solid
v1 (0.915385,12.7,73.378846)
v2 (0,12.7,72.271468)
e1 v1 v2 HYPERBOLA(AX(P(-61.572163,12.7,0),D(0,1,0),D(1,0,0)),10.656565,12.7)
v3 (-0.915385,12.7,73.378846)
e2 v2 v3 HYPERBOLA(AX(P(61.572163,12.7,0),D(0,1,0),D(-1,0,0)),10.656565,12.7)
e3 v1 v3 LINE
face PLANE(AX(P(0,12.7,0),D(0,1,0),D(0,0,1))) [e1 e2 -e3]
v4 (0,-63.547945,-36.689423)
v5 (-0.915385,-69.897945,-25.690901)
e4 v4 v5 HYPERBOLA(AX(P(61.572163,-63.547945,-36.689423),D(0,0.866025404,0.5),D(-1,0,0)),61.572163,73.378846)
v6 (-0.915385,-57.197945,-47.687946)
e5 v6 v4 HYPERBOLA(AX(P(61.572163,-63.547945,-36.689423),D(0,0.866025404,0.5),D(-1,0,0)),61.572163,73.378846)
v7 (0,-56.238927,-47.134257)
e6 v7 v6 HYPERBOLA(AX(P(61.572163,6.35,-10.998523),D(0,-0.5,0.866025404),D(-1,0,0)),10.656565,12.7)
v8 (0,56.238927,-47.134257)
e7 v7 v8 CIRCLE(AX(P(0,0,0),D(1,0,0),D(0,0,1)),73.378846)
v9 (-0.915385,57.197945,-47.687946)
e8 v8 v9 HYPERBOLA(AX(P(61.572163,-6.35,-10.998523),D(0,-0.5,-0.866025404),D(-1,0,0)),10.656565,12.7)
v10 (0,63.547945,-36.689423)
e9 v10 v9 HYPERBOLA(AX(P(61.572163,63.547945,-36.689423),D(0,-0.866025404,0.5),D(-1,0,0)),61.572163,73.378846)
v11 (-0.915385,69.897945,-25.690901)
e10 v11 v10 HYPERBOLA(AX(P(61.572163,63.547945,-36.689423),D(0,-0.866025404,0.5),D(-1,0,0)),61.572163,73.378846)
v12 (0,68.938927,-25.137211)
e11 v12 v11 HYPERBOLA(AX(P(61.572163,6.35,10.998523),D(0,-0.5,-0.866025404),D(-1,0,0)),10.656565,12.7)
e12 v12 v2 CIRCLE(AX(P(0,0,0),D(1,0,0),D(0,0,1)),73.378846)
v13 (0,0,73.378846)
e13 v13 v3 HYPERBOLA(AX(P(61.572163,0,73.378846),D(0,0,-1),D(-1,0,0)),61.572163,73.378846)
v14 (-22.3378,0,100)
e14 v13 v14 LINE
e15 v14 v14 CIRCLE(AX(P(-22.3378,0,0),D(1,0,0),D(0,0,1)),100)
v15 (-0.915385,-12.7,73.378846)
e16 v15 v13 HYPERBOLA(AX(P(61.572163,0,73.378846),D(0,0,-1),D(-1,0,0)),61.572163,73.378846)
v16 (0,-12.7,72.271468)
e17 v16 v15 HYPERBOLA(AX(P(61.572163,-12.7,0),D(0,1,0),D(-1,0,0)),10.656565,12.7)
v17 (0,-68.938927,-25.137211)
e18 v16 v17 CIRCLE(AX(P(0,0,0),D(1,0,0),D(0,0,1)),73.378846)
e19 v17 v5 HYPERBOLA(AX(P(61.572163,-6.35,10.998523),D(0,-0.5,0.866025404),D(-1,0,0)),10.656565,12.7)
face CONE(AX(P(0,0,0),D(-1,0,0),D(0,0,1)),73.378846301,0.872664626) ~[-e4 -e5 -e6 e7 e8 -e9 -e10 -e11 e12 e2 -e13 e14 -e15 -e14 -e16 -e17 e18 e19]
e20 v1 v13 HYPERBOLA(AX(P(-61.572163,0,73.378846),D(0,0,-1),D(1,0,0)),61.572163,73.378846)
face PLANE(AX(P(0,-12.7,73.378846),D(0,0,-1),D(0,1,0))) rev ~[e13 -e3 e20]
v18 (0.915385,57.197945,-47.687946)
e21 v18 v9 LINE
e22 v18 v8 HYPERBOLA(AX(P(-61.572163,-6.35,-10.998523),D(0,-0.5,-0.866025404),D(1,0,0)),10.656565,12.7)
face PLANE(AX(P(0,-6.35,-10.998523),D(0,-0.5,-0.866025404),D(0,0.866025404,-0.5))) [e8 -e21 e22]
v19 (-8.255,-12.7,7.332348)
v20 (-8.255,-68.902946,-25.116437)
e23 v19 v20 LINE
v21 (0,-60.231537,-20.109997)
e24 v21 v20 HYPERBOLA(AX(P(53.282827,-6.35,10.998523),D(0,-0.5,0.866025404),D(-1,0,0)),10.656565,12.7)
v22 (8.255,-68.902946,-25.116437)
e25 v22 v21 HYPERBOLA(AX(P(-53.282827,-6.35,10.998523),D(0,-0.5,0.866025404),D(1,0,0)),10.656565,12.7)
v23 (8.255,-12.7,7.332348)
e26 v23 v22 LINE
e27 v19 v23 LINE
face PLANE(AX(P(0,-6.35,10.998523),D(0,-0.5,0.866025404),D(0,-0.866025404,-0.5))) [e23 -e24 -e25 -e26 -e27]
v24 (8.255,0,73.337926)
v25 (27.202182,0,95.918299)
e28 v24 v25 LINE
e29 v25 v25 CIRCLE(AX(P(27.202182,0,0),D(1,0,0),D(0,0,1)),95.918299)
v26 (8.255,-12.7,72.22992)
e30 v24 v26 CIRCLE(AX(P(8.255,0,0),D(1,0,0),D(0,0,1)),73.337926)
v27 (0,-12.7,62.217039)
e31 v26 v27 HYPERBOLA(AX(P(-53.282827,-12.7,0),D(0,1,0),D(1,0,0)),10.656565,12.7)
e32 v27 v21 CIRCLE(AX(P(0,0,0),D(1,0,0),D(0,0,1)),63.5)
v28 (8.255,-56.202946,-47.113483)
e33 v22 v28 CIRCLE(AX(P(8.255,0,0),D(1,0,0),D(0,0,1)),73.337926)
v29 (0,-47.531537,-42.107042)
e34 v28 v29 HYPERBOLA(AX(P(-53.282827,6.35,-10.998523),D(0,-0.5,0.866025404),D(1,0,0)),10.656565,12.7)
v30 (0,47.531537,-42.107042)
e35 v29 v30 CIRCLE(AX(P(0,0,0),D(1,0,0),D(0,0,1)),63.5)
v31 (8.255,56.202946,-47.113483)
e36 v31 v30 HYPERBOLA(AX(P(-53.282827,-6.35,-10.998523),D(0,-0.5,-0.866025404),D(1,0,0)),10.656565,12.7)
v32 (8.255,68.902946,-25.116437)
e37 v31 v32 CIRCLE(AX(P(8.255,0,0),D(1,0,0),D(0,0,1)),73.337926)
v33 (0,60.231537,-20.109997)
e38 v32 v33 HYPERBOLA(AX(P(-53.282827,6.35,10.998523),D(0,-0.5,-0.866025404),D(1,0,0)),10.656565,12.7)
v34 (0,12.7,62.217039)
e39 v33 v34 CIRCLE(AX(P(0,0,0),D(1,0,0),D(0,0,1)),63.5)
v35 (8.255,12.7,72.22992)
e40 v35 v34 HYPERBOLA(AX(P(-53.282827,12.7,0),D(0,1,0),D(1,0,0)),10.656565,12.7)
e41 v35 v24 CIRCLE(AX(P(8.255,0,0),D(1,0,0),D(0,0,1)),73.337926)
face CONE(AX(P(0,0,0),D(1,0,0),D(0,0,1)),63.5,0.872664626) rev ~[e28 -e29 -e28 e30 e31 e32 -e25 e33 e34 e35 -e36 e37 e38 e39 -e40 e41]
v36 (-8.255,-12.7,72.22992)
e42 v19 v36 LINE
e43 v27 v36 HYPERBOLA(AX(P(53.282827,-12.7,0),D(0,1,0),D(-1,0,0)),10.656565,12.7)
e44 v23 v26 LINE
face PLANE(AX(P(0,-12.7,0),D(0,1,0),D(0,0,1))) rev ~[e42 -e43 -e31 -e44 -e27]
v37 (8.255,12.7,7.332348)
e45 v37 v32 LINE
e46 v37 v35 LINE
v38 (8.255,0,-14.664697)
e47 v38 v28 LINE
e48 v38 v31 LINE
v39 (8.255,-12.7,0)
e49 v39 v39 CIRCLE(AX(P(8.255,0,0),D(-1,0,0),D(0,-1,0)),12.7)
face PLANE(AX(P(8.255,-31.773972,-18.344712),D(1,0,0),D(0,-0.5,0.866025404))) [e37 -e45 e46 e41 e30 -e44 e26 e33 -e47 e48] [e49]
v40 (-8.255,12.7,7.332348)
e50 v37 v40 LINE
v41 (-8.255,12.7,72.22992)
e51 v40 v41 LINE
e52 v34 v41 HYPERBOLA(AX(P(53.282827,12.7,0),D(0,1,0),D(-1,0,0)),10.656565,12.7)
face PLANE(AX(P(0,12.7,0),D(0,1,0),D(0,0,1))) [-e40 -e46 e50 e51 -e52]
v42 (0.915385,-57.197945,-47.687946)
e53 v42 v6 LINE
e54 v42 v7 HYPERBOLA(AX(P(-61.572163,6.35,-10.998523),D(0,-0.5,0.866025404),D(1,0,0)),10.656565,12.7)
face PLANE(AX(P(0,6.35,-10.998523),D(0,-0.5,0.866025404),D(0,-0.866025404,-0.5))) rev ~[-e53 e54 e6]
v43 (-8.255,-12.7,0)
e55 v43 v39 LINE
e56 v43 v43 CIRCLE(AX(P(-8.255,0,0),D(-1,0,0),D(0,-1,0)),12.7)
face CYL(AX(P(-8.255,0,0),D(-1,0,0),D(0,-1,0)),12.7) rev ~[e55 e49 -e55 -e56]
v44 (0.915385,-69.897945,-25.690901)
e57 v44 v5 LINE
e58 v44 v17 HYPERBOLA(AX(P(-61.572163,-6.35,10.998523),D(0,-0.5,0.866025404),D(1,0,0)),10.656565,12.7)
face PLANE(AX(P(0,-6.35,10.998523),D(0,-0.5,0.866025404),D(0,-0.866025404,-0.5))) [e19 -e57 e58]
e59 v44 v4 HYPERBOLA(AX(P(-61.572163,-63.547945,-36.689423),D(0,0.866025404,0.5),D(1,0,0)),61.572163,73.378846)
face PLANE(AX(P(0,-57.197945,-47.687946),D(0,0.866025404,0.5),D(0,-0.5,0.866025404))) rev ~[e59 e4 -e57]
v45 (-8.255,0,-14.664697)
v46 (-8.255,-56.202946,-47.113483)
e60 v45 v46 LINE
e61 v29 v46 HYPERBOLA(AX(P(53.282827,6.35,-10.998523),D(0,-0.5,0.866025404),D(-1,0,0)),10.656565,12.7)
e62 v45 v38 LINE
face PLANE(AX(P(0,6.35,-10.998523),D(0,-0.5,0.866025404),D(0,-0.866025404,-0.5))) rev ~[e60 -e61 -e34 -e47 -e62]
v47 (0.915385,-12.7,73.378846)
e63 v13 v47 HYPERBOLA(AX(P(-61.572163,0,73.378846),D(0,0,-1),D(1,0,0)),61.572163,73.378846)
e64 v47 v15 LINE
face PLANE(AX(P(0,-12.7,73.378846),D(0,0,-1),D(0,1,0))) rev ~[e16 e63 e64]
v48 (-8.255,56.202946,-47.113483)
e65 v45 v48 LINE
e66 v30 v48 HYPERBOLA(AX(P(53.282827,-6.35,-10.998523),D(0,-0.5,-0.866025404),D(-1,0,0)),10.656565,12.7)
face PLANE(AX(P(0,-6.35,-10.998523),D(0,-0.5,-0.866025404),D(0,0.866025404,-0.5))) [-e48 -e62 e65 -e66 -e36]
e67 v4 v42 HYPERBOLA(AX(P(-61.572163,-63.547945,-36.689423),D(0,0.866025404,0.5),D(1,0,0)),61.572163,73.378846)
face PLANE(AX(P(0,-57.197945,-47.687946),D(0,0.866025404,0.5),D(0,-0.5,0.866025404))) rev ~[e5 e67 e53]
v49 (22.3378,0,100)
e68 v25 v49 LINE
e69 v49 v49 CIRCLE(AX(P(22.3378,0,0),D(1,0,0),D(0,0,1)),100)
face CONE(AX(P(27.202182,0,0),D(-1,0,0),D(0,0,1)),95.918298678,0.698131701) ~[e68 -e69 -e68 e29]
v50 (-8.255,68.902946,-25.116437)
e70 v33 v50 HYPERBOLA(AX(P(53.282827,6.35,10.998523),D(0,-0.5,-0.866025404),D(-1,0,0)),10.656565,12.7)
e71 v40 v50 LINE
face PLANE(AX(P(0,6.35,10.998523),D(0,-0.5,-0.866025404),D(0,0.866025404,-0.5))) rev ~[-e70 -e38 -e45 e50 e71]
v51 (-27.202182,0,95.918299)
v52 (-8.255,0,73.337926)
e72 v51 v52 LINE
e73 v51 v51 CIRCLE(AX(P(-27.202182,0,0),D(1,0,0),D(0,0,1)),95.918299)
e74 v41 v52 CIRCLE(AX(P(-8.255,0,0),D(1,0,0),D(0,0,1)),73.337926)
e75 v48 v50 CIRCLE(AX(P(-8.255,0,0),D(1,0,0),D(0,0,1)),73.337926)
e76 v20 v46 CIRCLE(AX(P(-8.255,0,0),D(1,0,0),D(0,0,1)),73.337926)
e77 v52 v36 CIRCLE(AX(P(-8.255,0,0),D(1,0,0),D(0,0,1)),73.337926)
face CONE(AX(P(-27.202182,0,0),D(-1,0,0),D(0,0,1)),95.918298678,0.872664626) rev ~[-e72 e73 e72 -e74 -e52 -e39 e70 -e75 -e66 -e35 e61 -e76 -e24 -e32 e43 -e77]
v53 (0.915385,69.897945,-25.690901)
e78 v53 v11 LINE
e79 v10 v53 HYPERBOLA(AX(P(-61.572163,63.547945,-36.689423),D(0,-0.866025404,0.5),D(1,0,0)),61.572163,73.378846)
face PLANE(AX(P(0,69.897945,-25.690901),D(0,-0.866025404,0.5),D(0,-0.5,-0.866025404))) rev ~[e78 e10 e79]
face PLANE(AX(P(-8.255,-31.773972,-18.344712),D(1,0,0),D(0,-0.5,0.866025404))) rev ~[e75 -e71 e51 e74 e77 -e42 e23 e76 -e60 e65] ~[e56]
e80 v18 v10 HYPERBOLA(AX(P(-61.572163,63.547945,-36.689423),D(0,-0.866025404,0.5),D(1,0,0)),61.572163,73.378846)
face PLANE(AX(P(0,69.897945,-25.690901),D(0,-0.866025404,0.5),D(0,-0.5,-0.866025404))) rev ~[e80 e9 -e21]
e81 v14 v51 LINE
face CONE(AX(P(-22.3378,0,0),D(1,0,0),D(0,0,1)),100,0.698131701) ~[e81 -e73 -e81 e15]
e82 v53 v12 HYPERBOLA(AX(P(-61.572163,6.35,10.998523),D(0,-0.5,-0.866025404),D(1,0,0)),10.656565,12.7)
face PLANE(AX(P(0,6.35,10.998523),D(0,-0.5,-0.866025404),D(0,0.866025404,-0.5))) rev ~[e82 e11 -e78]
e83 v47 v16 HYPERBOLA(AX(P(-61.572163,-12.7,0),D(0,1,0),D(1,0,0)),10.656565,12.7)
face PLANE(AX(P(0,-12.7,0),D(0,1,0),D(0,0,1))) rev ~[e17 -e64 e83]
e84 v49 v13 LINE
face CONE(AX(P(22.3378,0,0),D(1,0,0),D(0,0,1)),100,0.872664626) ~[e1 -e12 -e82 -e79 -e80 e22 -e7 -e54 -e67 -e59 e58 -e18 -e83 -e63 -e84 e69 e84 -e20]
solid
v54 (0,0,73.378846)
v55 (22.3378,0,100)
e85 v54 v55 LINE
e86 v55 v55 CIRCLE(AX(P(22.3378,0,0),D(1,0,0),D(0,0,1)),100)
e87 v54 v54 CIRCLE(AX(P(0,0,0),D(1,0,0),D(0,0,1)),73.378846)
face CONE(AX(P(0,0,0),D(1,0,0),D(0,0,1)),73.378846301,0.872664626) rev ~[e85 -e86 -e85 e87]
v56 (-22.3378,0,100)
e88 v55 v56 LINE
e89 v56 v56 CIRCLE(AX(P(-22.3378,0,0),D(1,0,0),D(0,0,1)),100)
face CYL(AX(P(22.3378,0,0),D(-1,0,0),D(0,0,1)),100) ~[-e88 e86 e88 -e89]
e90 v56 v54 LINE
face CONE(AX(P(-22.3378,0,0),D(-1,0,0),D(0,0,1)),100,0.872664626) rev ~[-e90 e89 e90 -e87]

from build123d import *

# Parameters (mm, degrees)
F2_W            = 25.4
F2_H            = 73.3788463006
F3_DEPTH        = 8.255
F3_COPIES_COUNT = 3
F4_R            = 12.7
F5_DEPTH        = 35.4581824645


# Not quite as in the source:
# - a pattern or mirror of a feature is missing from the dataset's text; its kind, count and spacing are read off the source's solid


with BuildPart() as f1:
    # F0 (on Front) → F1 (revolve)
    with BuildSketch(Plane.XZ):
        Polygon((0, 73.3788463006), (-22.3378002507, 100), (-27.2021824645, 95.9182986785), (0, 63.5), (27.2021824645, 95.9182986785), (22.3378002507, 100), align=None)
    revolve(axis=Axis((12.7538797489, 0, 0), (1, 0, 0)))

    # F2 (on Right) → F3 (join, symmetric)
    with BuildSketch(Plane.YZ):
        with Locations((0, 36.6894231503)):
            Rectangle(F2_W, F2_H)
    f3 = extrude(amount=F3_DEPTH, both=True)

    # F3_copies: F3 ×3 about axis
    f3_copies_axis = Axis((0, 0, 0), (1, 0, 0))
    for i in range(1, F3_COPIES_COUNT):
        add(f3.rotate(f3_copies_axis, i * 360 / F3_COPIES_COUNT))

    # F4 (on face) → F5 (cut, through all)
    with BuildSketch(Plane(origin=(-8.255, 0, 0), x_dir=(0, -1, 0), z_dir=(-1, 0, 0))):
        Circle(F4_R)
    extrude(amount=-F5_DEPTH, mode=Mode.SUBTRACT)


with BuildPart() as f7:
    # F6 (on Front) → F7 (revolve)
    with BuildSketch(Plane.XZ):
        Polygon((22.3378002507, 100), (-22.3378002507, 100), (0, 73.3788463006), align=None)
    revolve(axis=Axis((4.5150928199, 0, 0), (1, 0, 0)))


solid = Compound([f1.part, f7.part])
